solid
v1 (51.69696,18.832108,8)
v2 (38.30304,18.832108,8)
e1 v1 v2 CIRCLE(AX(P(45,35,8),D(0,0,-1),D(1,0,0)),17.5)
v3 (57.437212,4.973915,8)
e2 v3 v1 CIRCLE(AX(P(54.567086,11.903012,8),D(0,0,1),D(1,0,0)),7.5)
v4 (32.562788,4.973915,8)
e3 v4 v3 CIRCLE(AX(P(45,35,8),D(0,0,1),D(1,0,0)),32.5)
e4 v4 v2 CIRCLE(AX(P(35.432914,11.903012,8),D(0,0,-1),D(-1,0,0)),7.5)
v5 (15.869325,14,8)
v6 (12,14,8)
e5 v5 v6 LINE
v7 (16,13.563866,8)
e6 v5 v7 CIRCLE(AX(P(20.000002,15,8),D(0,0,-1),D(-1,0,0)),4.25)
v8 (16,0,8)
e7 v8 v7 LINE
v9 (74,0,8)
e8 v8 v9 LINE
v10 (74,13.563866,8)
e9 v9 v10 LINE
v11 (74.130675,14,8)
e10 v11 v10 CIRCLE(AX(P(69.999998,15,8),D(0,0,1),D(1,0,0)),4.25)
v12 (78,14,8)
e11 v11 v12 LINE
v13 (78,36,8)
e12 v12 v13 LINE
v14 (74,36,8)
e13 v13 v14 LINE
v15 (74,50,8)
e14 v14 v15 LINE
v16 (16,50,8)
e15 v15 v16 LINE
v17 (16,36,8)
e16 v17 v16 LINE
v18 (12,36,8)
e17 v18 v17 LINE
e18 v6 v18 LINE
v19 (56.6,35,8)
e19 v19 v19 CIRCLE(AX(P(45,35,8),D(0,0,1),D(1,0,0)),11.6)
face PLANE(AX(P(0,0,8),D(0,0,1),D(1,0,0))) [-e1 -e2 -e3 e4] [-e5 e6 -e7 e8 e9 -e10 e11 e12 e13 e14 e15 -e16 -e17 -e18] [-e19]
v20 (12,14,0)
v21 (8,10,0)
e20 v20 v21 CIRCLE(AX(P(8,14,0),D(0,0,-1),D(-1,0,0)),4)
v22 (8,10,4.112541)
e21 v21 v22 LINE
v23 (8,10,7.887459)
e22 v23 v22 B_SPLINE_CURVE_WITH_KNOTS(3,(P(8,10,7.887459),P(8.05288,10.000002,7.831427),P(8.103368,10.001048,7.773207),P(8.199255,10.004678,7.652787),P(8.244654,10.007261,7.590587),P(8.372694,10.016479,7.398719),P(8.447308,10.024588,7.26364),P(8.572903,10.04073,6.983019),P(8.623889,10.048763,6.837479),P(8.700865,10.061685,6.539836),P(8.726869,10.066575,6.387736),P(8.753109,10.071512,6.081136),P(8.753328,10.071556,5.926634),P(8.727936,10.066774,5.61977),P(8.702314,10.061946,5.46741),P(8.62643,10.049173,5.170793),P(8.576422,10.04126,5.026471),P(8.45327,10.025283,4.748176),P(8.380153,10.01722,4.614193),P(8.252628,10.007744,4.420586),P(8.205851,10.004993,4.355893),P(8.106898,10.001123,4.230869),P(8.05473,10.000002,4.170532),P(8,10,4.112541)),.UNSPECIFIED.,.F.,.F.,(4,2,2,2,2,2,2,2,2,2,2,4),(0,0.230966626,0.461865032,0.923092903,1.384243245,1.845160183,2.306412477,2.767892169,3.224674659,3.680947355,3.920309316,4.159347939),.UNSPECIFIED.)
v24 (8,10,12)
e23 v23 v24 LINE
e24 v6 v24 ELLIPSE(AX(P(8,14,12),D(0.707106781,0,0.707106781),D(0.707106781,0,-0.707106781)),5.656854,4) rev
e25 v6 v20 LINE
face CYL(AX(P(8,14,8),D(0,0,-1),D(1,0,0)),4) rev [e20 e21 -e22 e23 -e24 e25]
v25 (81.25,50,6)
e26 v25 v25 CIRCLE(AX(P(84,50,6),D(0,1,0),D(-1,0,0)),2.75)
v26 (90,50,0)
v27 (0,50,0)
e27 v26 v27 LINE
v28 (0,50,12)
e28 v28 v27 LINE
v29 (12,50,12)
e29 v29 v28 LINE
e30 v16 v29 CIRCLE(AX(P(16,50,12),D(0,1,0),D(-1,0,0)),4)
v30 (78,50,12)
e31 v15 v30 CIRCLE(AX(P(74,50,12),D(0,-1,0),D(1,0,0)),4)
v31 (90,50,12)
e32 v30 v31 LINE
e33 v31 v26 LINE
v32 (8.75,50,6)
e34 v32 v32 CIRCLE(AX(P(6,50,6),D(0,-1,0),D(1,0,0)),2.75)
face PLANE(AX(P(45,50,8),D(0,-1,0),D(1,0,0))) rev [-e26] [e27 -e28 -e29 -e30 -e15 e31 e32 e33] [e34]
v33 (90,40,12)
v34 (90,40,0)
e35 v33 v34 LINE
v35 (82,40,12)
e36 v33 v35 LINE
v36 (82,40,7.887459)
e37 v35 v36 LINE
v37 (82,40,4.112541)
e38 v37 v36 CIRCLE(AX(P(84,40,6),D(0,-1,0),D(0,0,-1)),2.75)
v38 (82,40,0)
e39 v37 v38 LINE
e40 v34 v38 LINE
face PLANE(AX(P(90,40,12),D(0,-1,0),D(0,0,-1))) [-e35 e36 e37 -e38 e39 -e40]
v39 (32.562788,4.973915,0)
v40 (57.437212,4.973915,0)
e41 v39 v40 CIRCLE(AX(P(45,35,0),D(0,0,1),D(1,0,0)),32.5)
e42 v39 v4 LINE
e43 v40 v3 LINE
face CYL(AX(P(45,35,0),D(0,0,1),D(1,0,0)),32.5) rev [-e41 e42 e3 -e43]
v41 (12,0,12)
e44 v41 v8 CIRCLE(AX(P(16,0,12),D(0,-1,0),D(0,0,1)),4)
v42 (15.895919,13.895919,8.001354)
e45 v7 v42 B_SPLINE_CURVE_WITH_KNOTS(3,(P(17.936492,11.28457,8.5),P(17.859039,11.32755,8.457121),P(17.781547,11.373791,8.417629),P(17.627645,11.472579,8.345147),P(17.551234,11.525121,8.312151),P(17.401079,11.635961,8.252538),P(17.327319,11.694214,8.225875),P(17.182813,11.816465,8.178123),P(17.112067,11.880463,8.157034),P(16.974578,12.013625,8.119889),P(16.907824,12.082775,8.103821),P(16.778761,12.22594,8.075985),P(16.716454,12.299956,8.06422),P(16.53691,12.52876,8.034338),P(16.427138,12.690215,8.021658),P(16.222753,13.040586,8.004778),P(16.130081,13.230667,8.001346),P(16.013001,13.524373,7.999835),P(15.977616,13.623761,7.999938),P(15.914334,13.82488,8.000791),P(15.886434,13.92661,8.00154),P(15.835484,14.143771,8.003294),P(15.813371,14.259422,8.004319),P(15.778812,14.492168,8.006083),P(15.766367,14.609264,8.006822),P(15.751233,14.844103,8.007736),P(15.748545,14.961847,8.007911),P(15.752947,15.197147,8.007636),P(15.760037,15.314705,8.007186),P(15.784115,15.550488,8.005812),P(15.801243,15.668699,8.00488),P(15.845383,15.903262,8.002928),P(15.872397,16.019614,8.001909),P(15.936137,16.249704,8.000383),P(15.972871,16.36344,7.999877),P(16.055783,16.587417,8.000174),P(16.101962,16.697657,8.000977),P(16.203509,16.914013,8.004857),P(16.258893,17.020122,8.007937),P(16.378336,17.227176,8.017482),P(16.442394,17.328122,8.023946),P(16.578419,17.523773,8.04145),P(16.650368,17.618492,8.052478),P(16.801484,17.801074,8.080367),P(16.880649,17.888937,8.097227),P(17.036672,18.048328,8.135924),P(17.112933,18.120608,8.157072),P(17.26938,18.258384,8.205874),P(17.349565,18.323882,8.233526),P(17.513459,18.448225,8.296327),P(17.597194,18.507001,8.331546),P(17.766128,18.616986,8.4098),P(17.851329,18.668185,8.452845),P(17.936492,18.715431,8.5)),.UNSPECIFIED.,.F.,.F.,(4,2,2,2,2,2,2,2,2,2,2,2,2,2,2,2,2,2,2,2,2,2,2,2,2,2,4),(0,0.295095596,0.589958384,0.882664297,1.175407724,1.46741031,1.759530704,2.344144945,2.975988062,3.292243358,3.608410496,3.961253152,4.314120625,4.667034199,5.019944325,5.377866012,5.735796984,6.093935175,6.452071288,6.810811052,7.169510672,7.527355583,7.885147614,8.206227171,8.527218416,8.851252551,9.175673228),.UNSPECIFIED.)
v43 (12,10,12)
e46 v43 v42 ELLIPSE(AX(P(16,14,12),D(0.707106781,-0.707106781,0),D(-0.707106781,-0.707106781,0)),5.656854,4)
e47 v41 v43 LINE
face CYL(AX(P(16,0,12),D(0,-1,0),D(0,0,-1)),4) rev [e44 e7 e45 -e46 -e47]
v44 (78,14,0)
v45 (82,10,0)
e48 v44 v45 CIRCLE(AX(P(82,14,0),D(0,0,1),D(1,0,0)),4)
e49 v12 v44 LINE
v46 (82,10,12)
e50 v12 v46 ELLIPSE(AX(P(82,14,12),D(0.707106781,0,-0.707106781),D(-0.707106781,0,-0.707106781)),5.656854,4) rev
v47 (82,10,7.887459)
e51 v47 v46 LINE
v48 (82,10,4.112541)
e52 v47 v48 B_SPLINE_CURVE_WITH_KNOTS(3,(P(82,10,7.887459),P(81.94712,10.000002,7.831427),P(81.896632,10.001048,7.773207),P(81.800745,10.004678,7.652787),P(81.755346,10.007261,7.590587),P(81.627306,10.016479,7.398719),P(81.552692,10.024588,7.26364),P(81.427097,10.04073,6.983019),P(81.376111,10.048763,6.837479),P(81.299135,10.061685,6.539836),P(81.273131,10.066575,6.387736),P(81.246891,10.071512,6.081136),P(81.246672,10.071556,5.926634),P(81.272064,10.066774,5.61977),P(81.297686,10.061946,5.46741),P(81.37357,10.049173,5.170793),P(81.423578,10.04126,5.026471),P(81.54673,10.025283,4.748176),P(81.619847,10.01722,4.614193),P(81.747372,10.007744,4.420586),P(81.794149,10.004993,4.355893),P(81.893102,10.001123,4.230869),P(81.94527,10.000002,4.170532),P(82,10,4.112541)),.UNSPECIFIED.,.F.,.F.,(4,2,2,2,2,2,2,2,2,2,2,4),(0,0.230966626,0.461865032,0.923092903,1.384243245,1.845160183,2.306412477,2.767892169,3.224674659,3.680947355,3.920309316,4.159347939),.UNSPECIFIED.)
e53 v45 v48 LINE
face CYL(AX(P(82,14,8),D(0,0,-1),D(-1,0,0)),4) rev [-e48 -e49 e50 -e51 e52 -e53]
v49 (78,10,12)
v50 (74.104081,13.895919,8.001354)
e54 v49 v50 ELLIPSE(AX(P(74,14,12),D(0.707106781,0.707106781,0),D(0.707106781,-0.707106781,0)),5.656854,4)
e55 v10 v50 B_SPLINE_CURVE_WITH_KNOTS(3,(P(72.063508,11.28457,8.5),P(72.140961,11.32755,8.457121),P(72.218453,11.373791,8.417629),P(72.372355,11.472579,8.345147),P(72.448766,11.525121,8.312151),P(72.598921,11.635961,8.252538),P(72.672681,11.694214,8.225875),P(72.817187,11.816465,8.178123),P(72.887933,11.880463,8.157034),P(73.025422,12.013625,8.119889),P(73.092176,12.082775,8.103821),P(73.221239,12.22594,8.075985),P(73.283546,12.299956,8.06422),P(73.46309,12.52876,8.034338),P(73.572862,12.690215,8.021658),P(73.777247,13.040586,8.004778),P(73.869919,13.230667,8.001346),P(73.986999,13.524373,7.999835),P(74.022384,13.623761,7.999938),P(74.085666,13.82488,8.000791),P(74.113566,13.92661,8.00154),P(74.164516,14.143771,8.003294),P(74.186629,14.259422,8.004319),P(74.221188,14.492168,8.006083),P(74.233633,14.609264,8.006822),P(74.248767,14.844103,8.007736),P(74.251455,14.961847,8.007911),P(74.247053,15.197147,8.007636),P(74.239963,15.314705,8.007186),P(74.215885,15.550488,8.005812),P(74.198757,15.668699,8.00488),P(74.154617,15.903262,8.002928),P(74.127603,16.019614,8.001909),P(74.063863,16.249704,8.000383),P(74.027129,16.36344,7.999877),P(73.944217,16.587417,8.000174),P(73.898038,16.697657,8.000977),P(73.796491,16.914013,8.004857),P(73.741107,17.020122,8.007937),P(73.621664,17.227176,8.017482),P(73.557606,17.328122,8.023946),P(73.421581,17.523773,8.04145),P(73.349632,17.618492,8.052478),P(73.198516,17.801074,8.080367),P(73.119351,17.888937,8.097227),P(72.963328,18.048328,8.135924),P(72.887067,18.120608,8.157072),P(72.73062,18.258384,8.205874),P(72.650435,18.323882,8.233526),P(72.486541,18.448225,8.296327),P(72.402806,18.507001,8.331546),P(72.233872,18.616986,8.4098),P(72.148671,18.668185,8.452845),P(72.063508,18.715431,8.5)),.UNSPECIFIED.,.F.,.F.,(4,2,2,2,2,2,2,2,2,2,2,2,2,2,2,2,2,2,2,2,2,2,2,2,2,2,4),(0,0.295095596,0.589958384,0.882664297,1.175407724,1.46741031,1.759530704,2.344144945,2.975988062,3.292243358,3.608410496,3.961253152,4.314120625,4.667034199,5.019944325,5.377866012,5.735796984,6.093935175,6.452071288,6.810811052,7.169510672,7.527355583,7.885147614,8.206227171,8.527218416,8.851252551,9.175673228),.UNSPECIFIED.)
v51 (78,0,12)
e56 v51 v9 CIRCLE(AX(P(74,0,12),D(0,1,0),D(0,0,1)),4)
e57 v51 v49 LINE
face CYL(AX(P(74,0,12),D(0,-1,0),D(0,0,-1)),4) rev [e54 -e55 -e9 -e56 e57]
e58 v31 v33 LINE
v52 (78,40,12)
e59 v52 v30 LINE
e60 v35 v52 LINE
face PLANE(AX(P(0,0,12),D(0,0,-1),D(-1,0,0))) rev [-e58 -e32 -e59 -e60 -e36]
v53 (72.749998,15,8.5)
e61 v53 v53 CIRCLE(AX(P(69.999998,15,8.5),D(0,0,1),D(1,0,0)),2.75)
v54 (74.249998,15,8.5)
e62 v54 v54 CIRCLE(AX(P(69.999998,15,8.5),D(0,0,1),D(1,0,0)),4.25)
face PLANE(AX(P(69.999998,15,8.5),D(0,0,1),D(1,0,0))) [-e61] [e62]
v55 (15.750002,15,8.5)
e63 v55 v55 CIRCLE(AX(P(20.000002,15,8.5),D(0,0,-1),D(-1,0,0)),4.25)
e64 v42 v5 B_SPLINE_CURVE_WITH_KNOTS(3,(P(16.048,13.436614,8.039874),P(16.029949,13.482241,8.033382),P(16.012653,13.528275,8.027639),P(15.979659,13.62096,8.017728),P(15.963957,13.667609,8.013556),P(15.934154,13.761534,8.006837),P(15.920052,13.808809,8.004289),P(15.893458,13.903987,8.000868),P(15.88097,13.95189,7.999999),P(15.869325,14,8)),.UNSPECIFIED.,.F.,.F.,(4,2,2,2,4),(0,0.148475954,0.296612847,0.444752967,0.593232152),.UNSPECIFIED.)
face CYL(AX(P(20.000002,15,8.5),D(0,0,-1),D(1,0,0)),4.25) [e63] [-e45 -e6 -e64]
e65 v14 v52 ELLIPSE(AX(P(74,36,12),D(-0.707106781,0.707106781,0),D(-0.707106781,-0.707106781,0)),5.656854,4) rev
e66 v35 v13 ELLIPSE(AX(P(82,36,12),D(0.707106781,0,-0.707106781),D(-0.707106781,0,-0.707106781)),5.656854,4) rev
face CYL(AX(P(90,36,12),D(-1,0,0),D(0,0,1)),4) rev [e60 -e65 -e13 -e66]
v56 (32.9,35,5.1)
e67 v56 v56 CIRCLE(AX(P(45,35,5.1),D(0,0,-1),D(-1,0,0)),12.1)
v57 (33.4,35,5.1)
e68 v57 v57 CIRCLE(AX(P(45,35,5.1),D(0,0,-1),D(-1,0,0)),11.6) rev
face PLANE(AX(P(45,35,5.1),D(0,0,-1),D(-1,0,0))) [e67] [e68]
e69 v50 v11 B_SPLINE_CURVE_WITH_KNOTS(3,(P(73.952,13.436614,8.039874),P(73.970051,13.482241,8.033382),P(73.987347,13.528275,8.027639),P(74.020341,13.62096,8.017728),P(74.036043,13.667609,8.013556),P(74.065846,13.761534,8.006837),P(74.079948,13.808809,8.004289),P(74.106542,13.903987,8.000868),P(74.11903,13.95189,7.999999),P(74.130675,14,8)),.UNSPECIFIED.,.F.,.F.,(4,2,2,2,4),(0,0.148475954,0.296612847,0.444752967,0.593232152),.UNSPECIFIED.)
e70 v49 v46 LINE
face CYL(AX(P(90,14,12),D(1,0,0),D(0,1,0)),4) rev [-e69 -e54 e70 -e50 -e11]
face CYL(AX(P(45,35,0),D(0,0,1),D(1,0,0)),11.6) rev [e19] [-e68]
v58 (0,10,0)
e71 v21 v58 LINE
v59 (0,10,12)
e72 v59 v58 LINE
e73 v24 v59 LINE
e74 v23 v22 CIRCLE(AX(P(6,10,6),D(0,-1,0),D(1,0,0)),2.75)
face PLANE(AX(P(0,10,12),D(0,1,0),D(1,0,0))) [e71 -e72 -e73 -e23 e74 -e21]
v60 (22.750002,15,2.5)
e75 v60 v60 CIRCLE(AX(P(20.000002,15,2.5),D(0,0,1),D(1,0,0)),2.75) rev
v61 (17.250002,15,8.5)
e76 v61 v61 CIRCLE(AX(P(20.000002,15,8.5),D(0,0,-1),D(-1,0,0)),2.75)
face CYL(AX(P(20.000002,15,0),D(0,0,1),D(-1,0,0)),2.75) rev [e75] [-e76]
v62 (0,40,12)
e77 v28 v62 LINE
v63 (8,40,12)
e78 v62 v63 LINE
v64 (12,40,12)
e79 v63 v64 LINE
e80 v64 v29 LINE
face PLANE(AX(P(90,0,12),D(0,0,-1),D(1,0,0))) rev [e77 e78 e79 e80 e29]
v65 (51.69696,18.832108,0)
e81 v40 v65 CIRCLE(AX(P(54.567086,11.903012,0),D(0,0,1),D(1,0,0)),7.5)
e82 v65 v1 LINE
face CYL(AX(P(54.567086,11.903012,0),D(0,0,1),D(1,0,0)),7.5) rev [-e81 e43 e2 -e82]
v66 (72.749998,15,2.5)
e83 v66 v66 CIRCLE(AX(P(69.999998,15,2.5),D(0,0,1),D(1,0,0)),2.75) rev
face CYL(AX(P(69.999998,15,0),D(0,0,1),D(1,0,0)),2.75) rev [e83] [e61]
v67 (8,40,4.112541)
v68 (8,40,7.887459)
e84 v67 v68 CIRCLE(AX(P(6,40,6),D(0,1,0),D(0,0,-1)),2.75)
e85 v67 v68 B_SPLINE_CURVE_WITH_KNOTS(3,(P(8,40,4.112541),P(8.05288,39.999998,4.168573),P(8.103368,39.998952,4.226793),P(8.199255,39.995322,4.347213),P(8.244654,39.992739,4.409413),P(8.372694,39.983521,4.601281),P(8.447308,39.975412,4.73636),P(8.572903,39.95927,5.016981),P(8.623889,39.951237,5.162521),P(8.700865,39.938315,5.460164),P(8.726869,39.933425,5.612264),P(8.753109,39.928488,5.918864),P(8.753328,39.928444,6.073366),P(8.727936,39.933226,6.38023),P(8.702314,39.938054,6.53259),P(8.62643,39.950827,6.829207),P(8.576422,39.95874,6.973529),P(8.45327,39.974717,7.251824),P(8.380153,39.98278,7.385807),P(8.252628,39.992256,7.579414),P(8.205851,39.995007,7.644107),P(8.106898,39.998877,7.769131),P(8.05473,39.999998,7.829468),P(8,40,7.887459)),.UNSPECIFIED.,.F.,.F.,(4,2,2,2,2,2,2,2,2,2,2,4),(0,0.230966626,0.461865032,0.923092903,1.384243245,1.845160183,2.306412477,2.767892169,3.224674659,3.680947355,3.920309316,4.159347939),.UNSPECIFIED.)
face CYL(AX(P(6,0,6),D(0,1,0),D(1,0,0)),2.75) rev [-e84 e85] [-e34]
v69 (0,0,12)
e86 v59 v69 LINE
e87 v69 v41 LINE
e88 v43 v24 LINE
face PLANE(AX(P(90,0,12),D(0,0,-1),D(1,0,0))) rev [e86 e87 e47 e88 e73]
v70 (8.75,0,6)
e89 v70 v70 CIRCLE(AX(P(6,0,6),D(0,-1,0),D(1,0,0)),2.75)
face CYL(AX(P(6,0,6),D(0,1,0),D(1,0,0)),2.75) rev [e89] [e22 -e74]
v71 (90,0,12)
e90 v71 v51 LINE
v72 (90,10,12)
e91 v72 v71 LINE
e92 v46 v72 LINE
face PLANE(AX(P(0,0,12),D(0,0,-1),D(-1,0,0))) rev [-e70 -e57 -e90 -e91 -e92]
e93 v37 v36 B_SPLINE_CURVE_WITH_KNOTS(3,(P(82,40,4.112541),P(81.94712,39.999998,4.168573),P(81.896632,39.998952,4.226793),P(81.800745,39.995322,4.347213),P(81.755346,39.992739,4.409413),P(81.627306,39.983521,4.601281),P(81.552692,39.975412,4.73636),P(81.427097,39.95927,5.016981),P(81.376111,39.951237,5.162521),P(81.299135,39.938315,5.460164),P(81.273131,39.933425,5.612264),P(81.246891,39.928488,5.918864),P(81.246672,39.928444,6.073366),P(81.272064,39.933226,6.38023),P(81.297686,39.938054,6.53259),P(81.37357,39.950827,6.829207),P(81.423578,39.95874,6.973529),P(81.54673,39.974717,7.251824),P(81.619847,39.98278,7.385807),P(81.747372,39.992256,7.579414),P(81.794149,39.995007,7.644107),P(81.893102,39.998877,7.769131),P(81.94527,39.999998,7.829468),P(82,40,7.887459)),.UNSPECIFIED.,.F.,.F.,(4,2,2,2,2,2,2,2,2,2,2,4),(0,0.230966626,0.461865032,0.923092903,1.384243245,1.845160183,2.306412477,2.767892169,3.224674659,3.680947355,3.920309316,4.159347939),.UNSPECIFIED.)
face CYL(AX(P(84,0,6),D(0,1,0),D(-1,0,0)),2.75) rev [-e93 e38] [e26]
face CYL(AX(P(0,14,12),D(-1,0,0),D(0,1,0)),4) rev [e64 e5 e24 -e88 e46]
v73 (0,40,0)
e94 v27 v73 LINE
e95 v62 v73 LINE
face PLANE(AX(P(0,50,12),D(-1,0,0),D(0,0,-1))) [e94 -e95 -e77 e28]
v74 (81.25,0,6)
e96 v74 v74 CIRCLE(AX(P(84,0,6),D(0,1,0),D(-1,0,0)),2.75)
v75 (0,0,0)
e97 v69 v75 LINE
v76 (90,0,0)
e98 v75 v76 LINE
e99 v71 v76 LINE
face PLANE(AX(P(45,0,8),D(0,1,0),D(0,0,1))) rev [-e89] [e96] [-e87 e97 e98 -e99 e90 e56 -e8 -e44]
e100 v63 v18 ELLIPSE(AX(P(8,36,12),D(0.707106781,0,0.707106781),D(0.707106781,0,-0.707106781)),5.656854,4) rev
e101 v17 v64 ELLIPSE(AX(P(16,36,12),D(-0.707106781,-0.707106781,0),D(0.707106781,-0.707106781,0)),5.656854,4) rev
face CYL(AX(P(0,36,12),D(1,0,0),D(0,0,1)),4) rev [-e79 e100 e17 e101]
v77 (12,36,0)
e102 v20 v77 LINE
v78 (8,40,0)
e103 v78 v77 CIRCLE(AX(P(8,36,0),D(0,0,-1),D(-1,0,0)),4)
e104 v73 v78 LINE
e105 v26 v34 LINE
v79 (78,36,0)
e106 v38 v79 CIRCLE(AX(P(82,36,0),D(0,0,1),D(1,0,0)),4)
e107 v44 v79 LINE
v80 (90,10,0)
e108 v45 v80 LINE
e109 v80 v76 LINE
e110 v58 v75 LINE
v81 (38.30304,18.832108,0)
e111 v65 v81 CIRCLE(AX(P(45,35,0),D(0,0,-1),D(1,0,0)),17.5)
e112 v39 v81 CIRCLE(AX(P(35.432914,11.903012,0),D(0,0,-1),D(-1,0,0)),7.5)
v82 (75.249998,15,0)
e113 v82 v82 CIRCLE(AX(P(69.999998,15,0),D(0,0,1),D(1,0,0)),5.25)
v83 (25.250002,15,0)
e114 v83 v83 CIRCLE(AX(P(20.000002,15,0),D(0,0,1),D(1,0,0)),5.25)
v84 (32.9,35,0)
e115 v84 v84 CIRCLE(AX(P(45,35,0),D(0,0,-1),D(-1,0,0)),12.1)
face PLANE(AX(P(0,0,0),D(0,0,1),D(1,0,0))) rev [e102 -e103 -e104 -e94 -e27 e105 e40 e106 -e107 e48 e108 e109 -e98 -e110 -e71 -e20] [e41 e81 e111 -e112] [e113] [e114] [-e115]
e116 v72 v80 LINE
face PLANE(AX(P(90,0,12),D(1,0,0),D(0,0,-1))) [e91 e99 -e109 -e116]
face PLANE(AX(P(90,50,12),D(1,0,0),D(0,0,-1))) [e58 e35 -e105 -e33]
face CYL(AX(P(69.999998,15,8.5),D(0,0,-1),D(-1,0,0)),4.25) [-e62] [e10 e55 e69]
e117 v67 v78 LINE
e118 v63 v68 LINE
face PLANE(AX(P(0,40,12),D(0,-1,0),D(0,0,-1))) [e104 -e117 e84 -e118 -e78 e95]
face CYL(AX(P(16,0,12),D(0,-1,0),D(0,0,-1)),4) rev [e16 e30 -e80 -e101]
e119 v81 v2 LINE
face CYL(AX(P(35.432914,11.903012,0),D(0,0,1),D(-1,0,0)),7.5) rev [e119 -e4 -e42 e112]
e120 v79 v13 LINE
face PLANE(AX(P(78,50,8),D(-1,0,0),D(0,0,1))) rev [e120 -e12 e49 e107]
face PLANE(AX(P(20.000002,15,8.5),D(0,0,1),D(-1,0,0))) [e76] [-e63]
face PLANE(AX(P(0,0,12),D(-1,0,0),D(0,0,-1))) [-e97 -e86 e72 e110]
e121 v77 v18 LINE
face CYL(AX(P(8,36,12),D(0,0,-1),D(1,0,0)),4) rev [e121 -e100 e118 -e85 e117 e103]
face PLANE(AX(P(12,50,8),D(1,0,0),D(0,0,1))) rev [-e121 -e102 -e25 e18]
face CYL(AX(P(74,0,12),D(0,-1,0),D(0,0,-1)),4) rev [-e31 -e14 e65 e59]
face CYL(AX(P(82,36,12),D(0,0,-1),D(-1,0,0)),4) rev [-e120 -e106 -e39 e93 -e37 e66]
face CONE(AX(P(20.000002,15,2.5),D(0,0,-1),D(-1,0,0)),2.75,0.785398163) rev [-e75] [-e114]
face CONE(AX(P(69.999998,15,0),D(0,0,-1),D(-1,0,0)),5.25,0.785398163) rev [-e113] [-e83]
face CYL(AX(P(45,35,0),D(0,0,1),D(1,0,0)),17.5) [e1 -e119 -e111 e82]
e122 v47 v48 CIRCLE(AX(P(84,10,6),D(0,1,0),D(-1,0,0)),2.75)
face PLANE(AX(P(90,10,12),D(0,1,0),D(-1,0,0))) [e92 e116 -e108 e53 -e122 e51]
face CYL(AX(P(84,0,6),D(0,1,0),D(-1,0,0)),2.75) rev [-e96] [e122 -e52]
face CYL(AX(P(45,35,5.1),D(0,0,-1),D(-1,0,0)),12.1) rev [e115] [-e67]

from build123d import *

# Parameters (mm, degrees)
SKETCH1_W           = 33
SKETCH1_H           = 50
BOSS_EXTRUDE1_DEPTH = 8
SKETCH2_W           = 12
SKETCH2_H           = 10
BOSS_EXTRUDE2_DEPTH = 12
FILLET1_R           = 4
FILLET2_R           = 4
SKETCH3_R           = 2.75
SKETCH3_R_2         = 11.6
CUT_EXTRUDE1_DEPTH  = 104.266645155
BOSS_EXTRUDE3_START = 0.5
SKETCH4_R           = 4.25
SKETCH4_R_2         = 2.75
BOSS_EXTRUDE3_DEPTH = 0.5
SKETCH7_R           = 2.75
CUT_EXTRUDE3_DEPTH  = 104.653268207
SKETCH6_R           = 12.1
CUT_EXTRUDE2_DEPTH  = 5.1
CHAMFER1_SIZE       = 2.5


with BuildPart() as part:
    # Sketch1 → Boss-Extrude1 (new body)
    with BuildSketch(Plane.XY):
        with Locations((61.5, 25)):
            Rectangle(SKETCH1_W, SKETCH1_H)
    extrude(amount=BOSS_EXTRUDE1_DEPTH)

    # Sketch2 → Boss-Extrude2 (add)
    with BuildSketch(Plane(origin=(0, 0, 0), x_dir=(-1, 0, 0), z_dir=(0, 0, -1))):
        with Locations((-84, 45)):
            Rectangle(SKETCH2_W, SKETCH2_H)
        with Locations((-84, 5)):
            Rectangle(SKETCH2_W, SKETCH2_H)
    extrude(amount=-BOSS_EXTRUDE2_DEPTH)

    # Fillet1
    fillet1_edges = [part.edges().sort_by_distance(p)[0] for p in [
        (78, 40, 4),
        (78, 10, 4),
    ]]
    fillet(fillet1_edges, radius=FILLET1_R)

    # Fillet2
    fillet2_edges = [part.edges().sort_by_distance(p)[0] for p in [
        (78, 5, 8),
        (80, 10, 8),
        (78, 45, 8),
        (80, 40, 8),
    ]]
    fillet(fillet2_edges, radius=FILLET2_R - 0.0001)  # a hair under: the kernel refuses the full size

    # Sketch3 → Cut-Extrude1 (cut, through all)
    with BuildSketch(Plane.XY.offset(8)):
        with Locations((69.99999756, 15.000000247)):
            Circle(SKETCH3_R)
        with Locations((45, 35)):
            Circle(SKETCH3_R_2)
        with BuildLine():
            Line((27.5, 35), (12.5, 35))
            ThreePointArc((12.5, 35), (26.943967427, 7.9772376), (57.437211552, 4.973915193))
            ThreePointArc((57.437211552, 4.973915193), (61.496182303, 14.77313743), (51.696960066, 18.832108181))
            ThreePointArc((51.696960066, 18.832108181), (35.277520922, 20.449281785), (27.5, 35))
        make_face()
    extrude(amount=-CUT_EXTRUDE1_DEPTH, mode=Mode.SUBTRACT)

    # Sketch4 → Boss-Extrude3 (add)
    with BuildSketch(Plane.XY.offset(8).offset(BOSS_EXTRUDE3_START)):
        with Locations(Location((69.99999756, 15.000000247, 0), (0, 0, 340.25017454))):
            Circle(SKETCH4_R)
        with Locations((69.99999756, 15.000000247)):
            Circle(SKETCH4_R_2, mode=Mode.SUBTRACT)
    extrude(amount=-BOSS_EXTRUDE3_DEPTH)

    # Sketch7 → Cut-Extrude3 (cut, through all)
    with BuildSketch(Plane(origin=(0, 50, 0), x_dir=(1, 0, 0), z_dir=(0, 1, 0))):
        with Locations(Location((84, -6, 0), (0, 0, 180))):
            Circle(SKETCH7_R)
    extrude(amount=-CUT_EXTRUDE3_DEPTH, mode=Mode.SUBTRACT)

    # Mirror1: part across plane


with BuildPart() as part_1:
    add(part.part)
    add(part.part.mirror(Plane(origin=(45, 50, 8), x_dir=(0, 0, 1), z_dir=(1, 0, 0))))

    # Sketch6 → Cut-Extrude2 (cut)
    with BuildSketch(Plane(origin=(0, 0, 0), x_dir=(-1, 0, 0), z_dir=(0, 0, -1))):
        with Locations((-45, 35)):
            Circle(SKETCH6_R)
    extrude(amount=-CUT_EXTRUDE2_DEPTH, mode=Mode.SUBTRACT)

    # Chamfer1
    chamfer1_edges = [part_1.edges().sort_by_distance(p)[0] for p in [
        (22.75000244, 15.000000247, 0),
        (67.24999756, 15.000000247, 0),
    ]]
    chamfer(chamfer1_edges, length=CHAMFER1_SIZE)


solid = part_1.part
